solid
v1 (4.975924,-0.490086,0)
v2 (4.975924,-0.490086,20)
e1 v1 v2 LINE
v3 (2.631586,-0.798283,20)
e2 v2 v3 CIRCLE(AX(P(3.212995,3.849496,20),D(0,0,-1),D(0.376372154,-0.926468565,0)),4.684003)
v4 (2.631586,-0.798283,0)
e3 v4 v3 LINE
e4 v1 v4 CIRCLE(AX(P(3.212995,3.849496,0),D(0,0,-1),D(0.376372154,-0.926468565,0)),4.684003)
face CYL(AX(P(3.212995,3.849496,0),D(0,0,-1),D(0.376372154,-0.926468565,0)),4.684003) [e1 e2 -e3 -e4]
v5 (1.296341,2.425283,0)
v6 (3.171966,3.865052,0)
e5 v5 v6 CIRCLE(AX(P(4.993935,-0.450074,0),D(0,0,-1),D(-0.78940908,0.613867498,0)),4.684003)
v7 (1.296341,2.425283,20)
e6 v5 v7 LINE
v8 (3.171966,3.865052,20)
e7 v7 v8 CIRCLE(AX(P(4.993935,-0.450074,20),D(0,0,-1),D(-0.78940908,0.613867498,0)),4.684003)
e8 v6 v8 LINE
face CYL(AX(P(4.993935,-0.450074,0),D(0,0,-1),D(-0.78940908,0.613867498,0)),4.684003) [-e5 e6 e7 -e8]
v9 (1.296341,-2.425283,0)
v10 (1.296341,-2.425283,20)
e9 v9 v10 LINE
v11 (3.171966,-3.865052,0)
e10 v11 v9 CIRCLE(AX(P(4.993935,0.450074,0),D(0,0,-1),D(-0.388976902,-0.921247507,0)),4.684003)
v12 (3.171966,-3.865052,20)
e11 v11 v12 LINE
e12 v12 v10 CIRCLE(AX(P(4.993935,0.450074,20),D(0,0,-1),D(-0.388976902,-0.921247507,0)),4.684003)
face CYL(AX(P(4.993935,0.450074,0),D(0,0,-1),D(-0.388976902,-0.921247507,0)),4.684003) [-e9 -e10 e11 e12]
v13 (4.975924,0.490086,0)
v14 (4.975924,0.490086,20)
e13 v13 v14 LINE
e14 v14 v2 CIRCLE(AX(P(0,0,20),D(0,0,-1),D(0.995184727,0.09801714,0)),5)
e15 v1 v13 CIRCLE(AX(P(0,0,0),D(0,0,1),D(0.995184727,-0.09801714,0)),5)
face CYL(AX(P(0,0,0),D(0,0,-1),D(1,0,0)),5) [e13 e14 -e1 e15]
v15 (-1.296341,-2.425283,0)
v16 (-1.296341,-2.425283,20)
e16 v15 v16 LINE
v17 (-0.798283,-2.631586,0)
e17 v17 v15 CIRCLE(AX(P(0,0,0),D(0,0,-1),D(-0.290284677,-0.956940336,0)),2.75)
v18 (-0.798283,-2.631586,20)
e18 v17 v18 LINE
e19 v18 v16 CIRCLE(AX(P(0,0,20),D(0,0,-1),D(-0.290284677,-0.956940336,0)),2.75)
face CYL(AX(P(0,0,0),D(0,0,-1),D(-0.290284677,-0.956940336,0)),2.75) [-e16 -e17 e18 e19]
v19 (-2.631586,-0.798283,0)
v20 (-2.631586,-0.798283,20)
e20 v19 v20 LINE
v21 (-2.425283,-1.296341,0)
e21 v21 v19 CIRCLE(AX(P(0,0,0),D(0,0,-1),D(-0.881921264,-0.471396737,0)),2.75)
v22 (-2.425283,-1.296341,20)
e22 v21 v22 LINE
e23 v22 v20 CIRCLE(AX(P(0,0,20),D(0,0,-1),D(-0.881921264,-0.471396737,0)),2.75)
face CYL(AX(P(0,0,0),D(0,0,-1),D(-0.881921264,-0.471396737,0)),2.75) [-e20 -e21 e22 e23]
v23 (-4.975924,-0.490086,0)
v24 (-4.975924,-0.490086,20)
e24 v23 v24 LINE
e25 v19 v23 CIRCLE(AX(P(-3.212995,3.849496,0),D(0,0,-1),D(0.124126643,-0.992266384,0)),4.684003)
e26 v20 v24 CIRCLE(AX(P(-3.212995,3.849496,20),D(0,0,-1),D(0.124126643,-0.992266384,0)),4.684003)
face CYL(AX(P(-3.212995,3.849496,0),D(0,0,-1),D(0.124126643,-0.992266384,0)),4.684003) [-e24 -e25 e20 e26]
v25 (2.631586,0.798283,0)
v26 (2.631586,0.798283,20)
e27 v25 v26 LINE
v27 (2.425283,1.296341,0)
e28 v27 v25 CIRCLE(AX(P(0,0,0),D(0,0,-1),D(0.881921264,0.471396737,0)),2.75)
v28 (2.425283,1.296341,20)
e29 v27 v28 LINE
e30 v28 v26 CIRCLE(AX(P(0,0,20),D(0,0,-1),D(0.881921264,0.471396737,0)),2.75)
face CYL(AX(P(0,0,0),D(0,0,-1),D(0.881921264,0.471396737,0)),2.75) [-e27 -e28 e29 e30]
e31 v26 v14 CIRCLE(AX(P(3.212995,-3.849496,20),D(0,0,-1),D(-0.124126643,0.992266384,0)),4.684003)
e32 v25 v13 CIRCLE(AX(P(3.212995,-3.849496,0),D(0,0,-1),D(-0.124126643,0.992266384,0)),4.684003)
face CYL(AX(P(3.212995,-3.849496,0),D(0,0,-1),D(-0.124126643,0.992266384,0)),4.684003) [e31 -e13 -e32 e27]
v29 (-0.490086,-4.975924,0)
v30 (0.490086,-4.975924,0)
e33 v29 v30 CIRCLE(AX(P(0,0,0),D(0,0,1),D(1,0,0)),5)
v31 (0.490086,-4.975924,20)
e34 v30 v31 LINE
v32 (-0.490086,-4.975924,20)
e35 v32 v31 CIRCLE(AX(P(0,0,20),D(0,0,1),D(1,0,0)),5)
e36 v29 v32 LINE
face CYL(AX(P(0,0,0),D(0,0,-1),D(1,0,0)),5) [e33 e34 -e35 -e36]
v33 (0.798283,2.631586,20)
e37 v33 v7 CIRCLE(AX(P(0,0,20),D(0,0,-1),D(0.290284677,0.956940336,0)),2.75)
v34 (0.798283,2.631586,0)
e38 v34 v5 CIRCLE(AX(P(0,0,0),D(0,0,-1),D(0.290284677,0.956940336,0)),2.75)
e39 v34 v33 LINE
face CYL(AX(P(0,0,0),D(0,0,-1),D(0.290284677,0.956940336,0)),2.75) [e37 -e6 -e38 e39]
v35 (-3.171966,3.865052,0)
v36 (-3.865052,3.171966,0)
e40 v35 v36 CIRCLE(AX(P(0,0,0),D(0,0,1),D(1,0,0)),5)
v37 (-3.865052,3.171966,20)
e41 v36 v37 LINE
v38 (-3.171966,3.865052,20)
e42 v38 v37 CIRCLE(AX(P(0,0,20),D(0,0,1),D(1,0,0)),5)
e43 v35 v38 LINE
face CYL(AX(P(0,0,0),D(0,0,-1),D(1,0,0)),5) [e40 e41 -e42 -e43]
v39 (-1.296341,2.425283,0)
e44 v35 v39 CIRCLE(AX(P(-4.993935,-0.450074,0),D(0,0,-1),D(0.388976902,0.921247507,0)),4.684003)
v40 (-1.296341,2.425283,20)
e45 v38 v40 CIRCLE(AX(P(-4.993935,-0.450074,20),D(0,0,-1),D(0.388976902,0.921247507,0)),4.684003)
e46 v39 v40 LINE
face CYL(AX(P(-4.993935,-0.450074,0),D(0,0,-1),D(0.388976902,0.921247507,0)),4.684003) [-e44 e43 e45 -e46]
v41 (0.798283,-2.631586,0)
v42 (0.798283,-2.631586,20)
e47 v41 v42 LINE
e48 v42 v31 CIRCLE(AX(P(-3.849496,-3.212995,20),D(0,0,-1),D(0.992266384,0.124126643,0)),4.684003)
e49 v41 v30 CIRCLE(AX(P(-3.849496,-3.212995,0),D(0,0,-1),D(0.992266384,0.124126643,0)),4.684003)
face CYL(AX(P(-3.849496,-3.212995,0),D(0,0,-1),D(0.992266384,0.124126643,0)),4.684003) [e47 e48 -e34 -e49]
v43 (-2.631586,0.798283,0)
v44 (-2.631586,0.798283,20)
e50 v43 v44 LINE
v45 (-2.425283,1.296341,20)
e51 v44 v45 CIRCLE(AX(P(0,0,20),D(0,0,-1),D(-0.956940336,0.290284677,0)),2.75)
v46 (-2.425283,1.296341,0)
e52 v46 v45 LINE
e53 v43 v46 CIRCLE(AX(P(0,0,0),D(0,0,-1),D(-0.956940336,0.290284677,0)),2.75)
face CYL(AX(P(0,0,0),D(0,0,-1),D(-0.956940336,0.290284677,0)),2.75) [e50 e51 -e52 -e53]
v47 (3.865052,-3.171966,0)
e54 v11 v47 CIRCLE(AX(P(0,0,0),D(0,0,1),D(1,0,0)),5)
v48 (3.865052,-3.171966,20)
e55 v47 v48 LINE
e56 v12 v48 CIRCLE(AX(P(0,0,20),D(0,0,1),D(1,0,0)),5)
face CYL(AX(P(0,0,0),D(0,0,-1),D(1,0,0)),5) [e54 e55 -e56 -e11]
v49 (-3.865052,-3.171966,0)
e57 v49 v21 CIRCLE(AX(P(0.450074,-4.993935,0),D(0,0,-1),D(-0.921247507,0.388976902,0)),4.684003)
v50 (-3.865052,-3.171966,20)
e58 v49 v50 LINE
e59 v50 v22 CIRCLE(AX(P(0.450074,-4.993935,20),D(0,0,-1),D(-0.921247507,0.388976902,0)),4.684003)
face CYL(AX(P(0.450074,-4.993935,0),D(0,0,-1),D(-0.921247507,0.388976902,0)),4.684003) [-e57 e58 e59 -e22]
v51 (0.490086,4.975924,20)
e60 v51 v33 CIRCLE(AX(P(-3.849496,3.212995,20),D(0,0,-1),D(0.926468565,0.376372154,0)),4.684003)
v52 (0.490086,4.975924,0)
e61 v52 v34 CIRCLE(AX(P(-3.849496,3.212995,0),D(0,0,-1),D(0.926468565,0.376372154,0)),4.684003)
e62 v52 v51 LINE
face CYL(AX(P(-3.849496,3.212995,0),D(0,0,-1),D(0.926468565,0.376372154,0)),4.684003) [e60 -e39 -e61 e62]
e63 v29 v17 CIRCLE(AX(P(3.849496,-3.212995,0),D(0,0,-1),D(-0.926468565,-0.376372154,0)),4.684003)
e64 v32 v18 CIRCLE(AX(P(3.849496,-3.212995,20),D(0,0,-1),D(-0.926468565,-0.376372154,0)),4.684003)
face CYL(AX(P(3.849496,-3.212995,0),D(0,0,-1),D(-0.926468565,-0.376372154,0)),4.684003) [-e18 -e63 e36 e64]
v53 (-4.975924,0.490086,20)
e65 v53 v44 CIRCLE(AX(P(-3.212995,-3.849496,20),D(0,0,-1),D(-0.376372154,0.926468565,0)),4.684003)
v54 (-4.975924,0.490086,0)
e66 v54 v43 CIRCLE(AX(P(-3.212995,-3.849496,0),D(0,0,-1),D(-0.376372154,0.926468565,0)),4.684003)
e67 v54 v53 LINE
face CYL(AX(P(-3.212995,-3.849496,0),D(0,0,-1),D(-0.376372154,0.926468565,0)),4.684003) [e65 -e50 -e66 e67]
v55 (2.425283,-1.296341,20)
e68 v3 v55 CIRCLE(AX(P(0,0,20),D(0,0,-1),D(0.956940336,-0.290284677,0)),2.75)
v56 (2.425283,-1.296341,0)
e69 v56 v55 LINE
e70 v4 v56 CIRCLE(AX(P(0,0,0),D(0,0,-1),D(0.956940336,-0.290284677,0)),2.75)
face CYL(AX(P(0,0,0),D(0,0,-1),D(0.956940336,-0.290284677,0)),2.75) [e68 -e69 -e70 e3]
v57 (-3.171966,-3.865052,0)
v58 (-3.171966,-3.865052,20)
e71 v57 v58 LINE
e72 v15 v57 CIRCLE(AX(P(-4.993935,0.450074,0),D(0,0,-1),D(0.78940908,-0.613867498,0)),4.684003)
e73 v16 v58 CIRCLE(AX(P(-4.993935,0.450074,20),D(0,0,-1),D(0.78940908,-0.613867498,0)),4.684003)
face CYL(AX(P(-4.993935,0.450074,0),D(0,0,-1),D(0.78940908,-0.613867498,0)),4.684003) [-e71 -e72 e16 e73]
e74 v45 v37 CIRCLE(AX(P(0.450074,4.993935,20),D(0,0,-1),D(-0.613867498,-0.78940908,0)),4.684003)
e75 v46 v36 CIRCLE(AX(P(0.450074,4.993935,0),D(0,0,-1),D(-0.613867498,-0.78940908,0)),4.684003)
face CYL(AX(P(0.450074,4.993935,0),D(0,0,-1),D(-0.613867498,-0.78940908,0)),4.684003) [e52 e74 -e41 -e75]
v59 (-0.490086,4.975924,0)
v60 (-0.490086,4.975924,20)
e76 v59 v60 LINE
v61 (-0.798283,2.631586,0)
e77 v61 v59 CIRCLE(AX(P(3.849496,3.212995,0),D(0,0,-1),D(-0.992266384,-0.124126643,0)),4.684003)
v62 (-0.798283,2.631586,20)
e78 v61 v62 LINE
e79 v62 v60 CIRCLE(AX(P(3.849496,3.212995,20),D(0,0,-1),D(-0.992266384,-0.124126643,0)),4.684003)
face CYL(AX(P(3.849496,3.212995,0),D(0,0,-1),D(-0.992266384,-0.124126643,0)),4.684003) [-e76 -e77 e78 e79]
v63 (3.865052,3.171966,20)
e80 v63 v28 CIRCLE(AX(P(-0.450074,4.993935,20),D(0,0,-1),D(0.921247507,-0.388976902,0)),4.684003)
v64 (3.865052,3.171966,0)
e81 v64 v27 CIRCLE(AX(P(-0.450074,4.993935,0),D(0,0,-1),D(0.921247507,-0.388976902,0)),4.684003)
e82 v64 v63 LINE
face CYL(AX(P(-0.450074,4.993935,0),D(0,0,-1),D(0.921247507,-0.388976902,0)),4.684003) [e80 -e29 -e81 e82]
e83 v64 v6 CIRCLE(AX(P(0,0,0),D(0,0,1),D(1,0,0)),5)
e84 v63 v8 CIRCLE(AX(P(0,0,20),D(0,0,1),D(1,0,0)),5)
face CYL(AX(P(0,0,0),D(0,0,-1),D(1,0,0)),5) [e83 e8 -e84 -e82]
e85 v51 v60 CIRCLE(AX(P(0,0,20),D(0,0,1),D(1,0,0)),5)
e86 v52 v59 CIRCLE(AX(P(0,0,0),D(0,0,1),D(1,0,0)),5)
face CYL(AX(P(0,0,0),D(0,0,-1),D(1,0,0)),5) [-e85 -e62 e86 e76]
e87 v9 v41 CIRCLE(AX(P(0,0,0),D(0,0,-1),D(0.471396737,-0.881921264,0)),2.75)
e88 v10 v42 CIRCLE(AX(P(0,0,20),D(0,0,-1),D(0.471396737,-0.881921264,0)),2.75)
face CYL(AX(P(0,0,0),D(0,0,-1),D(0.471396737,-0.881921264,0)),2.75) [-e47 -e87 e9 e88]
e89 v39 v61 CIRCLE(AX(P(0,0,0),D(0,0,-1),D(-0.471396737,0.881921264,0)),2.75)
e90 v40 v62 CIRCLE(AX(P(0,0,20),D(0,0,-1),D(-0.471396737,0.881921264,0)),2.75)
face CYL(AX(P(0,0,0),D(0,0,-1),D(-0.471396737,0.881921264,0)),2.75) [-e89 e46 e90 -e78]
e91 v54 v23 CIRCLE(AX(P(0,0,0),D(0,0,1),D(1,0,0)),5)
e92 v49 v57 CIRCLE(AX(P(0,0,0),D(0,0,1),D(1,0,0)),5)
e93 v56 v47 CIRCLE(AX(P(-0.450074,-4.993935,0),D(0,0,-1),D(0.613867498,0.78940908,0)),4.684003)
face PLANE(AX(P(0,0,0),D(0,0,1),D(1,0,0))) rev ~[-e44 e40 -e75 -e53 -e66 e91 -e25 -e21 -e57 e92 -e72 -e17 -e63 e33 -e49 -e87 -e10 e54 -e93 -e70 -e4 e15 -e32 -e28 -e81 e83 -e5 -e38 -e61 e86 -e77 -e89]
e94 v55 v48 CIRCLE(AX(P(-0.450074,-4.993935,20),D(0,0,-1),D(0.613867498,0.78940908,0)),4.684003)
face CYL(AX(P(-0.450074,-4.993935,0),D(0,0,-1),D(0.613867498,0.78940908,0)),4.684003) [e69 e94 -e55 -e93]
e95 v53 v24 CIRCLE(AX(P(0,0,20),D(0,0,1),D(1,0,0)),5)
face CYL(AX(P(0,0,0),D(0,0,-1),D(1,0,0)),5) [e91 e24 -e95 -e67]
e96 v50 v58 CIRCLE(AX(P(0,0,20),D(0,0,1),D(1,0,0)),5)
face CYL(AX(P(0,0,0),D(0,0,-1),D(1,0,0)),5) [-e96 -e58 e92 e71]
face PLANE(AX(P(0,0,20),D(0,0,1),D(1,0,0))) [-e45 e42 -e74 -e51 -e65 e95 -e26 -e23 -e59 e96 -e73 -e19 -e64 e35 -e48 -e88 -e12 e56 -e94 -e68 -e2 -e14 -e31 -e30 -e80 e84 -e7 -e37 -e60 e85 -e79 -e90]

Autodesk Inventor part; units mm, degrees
sketch "Sketch1" plane through (0, 0, 0) normal (0, 0, 1) x (1, 0, 0)
  circle A0 centre (0, 0) radius 5
  dimension "d0" = 10
extrude "Extrusion1" add sketch "Sketch1" along normal blind 20
ref_plane "Work Plane2" through (0, 0, 10) normal (0, 0, 1) x (1, 0, 0)
sketch "Sketch2" plane through (0, 0, 0) normal (0, 0, -1) x (-1, 0, 0)
  circle A0 centre (0, 0) radius 5 projected
  circle A1 centre (0, 0) radius 4
  dimension "d3" = 8
surface extrude "Pitch Diameter" sketch "Sketch2" against normal through all shown no curves A1
ref_plane "Work Plane8" through (0, 0, 0) normal (0.9238795, 0.3826834, 0) x (0, 0, 1)
ref_plane "Work Plane9" through (0, 0, 0) normal (1, 0, 0) x (0, 1, 0)
spur gear teeth "Spur Gear" teeth 8 pitch diameter 8 tip diameter 10 root diameter 5.5 face width 20 start plane through (0, 0, 0) normal (0, 0, -1) x (-1, 0, 0)
equation "\"d0\" = da_da"
equation "\"d1\" = da_b"
equation "\"d3\" = da_d"
equation "\"d16\" = da_aw"
equation "\"d43\" = da_aw"
equation "\"d46\" = da_aw"
equation "\"da_da\" = 10"
equation "\"da_b\" = 20"
equation "\"da_d\" = 8"
equation "\"da_aw\" = 12"
properties part number "Spur Gear2" material "Steel"
